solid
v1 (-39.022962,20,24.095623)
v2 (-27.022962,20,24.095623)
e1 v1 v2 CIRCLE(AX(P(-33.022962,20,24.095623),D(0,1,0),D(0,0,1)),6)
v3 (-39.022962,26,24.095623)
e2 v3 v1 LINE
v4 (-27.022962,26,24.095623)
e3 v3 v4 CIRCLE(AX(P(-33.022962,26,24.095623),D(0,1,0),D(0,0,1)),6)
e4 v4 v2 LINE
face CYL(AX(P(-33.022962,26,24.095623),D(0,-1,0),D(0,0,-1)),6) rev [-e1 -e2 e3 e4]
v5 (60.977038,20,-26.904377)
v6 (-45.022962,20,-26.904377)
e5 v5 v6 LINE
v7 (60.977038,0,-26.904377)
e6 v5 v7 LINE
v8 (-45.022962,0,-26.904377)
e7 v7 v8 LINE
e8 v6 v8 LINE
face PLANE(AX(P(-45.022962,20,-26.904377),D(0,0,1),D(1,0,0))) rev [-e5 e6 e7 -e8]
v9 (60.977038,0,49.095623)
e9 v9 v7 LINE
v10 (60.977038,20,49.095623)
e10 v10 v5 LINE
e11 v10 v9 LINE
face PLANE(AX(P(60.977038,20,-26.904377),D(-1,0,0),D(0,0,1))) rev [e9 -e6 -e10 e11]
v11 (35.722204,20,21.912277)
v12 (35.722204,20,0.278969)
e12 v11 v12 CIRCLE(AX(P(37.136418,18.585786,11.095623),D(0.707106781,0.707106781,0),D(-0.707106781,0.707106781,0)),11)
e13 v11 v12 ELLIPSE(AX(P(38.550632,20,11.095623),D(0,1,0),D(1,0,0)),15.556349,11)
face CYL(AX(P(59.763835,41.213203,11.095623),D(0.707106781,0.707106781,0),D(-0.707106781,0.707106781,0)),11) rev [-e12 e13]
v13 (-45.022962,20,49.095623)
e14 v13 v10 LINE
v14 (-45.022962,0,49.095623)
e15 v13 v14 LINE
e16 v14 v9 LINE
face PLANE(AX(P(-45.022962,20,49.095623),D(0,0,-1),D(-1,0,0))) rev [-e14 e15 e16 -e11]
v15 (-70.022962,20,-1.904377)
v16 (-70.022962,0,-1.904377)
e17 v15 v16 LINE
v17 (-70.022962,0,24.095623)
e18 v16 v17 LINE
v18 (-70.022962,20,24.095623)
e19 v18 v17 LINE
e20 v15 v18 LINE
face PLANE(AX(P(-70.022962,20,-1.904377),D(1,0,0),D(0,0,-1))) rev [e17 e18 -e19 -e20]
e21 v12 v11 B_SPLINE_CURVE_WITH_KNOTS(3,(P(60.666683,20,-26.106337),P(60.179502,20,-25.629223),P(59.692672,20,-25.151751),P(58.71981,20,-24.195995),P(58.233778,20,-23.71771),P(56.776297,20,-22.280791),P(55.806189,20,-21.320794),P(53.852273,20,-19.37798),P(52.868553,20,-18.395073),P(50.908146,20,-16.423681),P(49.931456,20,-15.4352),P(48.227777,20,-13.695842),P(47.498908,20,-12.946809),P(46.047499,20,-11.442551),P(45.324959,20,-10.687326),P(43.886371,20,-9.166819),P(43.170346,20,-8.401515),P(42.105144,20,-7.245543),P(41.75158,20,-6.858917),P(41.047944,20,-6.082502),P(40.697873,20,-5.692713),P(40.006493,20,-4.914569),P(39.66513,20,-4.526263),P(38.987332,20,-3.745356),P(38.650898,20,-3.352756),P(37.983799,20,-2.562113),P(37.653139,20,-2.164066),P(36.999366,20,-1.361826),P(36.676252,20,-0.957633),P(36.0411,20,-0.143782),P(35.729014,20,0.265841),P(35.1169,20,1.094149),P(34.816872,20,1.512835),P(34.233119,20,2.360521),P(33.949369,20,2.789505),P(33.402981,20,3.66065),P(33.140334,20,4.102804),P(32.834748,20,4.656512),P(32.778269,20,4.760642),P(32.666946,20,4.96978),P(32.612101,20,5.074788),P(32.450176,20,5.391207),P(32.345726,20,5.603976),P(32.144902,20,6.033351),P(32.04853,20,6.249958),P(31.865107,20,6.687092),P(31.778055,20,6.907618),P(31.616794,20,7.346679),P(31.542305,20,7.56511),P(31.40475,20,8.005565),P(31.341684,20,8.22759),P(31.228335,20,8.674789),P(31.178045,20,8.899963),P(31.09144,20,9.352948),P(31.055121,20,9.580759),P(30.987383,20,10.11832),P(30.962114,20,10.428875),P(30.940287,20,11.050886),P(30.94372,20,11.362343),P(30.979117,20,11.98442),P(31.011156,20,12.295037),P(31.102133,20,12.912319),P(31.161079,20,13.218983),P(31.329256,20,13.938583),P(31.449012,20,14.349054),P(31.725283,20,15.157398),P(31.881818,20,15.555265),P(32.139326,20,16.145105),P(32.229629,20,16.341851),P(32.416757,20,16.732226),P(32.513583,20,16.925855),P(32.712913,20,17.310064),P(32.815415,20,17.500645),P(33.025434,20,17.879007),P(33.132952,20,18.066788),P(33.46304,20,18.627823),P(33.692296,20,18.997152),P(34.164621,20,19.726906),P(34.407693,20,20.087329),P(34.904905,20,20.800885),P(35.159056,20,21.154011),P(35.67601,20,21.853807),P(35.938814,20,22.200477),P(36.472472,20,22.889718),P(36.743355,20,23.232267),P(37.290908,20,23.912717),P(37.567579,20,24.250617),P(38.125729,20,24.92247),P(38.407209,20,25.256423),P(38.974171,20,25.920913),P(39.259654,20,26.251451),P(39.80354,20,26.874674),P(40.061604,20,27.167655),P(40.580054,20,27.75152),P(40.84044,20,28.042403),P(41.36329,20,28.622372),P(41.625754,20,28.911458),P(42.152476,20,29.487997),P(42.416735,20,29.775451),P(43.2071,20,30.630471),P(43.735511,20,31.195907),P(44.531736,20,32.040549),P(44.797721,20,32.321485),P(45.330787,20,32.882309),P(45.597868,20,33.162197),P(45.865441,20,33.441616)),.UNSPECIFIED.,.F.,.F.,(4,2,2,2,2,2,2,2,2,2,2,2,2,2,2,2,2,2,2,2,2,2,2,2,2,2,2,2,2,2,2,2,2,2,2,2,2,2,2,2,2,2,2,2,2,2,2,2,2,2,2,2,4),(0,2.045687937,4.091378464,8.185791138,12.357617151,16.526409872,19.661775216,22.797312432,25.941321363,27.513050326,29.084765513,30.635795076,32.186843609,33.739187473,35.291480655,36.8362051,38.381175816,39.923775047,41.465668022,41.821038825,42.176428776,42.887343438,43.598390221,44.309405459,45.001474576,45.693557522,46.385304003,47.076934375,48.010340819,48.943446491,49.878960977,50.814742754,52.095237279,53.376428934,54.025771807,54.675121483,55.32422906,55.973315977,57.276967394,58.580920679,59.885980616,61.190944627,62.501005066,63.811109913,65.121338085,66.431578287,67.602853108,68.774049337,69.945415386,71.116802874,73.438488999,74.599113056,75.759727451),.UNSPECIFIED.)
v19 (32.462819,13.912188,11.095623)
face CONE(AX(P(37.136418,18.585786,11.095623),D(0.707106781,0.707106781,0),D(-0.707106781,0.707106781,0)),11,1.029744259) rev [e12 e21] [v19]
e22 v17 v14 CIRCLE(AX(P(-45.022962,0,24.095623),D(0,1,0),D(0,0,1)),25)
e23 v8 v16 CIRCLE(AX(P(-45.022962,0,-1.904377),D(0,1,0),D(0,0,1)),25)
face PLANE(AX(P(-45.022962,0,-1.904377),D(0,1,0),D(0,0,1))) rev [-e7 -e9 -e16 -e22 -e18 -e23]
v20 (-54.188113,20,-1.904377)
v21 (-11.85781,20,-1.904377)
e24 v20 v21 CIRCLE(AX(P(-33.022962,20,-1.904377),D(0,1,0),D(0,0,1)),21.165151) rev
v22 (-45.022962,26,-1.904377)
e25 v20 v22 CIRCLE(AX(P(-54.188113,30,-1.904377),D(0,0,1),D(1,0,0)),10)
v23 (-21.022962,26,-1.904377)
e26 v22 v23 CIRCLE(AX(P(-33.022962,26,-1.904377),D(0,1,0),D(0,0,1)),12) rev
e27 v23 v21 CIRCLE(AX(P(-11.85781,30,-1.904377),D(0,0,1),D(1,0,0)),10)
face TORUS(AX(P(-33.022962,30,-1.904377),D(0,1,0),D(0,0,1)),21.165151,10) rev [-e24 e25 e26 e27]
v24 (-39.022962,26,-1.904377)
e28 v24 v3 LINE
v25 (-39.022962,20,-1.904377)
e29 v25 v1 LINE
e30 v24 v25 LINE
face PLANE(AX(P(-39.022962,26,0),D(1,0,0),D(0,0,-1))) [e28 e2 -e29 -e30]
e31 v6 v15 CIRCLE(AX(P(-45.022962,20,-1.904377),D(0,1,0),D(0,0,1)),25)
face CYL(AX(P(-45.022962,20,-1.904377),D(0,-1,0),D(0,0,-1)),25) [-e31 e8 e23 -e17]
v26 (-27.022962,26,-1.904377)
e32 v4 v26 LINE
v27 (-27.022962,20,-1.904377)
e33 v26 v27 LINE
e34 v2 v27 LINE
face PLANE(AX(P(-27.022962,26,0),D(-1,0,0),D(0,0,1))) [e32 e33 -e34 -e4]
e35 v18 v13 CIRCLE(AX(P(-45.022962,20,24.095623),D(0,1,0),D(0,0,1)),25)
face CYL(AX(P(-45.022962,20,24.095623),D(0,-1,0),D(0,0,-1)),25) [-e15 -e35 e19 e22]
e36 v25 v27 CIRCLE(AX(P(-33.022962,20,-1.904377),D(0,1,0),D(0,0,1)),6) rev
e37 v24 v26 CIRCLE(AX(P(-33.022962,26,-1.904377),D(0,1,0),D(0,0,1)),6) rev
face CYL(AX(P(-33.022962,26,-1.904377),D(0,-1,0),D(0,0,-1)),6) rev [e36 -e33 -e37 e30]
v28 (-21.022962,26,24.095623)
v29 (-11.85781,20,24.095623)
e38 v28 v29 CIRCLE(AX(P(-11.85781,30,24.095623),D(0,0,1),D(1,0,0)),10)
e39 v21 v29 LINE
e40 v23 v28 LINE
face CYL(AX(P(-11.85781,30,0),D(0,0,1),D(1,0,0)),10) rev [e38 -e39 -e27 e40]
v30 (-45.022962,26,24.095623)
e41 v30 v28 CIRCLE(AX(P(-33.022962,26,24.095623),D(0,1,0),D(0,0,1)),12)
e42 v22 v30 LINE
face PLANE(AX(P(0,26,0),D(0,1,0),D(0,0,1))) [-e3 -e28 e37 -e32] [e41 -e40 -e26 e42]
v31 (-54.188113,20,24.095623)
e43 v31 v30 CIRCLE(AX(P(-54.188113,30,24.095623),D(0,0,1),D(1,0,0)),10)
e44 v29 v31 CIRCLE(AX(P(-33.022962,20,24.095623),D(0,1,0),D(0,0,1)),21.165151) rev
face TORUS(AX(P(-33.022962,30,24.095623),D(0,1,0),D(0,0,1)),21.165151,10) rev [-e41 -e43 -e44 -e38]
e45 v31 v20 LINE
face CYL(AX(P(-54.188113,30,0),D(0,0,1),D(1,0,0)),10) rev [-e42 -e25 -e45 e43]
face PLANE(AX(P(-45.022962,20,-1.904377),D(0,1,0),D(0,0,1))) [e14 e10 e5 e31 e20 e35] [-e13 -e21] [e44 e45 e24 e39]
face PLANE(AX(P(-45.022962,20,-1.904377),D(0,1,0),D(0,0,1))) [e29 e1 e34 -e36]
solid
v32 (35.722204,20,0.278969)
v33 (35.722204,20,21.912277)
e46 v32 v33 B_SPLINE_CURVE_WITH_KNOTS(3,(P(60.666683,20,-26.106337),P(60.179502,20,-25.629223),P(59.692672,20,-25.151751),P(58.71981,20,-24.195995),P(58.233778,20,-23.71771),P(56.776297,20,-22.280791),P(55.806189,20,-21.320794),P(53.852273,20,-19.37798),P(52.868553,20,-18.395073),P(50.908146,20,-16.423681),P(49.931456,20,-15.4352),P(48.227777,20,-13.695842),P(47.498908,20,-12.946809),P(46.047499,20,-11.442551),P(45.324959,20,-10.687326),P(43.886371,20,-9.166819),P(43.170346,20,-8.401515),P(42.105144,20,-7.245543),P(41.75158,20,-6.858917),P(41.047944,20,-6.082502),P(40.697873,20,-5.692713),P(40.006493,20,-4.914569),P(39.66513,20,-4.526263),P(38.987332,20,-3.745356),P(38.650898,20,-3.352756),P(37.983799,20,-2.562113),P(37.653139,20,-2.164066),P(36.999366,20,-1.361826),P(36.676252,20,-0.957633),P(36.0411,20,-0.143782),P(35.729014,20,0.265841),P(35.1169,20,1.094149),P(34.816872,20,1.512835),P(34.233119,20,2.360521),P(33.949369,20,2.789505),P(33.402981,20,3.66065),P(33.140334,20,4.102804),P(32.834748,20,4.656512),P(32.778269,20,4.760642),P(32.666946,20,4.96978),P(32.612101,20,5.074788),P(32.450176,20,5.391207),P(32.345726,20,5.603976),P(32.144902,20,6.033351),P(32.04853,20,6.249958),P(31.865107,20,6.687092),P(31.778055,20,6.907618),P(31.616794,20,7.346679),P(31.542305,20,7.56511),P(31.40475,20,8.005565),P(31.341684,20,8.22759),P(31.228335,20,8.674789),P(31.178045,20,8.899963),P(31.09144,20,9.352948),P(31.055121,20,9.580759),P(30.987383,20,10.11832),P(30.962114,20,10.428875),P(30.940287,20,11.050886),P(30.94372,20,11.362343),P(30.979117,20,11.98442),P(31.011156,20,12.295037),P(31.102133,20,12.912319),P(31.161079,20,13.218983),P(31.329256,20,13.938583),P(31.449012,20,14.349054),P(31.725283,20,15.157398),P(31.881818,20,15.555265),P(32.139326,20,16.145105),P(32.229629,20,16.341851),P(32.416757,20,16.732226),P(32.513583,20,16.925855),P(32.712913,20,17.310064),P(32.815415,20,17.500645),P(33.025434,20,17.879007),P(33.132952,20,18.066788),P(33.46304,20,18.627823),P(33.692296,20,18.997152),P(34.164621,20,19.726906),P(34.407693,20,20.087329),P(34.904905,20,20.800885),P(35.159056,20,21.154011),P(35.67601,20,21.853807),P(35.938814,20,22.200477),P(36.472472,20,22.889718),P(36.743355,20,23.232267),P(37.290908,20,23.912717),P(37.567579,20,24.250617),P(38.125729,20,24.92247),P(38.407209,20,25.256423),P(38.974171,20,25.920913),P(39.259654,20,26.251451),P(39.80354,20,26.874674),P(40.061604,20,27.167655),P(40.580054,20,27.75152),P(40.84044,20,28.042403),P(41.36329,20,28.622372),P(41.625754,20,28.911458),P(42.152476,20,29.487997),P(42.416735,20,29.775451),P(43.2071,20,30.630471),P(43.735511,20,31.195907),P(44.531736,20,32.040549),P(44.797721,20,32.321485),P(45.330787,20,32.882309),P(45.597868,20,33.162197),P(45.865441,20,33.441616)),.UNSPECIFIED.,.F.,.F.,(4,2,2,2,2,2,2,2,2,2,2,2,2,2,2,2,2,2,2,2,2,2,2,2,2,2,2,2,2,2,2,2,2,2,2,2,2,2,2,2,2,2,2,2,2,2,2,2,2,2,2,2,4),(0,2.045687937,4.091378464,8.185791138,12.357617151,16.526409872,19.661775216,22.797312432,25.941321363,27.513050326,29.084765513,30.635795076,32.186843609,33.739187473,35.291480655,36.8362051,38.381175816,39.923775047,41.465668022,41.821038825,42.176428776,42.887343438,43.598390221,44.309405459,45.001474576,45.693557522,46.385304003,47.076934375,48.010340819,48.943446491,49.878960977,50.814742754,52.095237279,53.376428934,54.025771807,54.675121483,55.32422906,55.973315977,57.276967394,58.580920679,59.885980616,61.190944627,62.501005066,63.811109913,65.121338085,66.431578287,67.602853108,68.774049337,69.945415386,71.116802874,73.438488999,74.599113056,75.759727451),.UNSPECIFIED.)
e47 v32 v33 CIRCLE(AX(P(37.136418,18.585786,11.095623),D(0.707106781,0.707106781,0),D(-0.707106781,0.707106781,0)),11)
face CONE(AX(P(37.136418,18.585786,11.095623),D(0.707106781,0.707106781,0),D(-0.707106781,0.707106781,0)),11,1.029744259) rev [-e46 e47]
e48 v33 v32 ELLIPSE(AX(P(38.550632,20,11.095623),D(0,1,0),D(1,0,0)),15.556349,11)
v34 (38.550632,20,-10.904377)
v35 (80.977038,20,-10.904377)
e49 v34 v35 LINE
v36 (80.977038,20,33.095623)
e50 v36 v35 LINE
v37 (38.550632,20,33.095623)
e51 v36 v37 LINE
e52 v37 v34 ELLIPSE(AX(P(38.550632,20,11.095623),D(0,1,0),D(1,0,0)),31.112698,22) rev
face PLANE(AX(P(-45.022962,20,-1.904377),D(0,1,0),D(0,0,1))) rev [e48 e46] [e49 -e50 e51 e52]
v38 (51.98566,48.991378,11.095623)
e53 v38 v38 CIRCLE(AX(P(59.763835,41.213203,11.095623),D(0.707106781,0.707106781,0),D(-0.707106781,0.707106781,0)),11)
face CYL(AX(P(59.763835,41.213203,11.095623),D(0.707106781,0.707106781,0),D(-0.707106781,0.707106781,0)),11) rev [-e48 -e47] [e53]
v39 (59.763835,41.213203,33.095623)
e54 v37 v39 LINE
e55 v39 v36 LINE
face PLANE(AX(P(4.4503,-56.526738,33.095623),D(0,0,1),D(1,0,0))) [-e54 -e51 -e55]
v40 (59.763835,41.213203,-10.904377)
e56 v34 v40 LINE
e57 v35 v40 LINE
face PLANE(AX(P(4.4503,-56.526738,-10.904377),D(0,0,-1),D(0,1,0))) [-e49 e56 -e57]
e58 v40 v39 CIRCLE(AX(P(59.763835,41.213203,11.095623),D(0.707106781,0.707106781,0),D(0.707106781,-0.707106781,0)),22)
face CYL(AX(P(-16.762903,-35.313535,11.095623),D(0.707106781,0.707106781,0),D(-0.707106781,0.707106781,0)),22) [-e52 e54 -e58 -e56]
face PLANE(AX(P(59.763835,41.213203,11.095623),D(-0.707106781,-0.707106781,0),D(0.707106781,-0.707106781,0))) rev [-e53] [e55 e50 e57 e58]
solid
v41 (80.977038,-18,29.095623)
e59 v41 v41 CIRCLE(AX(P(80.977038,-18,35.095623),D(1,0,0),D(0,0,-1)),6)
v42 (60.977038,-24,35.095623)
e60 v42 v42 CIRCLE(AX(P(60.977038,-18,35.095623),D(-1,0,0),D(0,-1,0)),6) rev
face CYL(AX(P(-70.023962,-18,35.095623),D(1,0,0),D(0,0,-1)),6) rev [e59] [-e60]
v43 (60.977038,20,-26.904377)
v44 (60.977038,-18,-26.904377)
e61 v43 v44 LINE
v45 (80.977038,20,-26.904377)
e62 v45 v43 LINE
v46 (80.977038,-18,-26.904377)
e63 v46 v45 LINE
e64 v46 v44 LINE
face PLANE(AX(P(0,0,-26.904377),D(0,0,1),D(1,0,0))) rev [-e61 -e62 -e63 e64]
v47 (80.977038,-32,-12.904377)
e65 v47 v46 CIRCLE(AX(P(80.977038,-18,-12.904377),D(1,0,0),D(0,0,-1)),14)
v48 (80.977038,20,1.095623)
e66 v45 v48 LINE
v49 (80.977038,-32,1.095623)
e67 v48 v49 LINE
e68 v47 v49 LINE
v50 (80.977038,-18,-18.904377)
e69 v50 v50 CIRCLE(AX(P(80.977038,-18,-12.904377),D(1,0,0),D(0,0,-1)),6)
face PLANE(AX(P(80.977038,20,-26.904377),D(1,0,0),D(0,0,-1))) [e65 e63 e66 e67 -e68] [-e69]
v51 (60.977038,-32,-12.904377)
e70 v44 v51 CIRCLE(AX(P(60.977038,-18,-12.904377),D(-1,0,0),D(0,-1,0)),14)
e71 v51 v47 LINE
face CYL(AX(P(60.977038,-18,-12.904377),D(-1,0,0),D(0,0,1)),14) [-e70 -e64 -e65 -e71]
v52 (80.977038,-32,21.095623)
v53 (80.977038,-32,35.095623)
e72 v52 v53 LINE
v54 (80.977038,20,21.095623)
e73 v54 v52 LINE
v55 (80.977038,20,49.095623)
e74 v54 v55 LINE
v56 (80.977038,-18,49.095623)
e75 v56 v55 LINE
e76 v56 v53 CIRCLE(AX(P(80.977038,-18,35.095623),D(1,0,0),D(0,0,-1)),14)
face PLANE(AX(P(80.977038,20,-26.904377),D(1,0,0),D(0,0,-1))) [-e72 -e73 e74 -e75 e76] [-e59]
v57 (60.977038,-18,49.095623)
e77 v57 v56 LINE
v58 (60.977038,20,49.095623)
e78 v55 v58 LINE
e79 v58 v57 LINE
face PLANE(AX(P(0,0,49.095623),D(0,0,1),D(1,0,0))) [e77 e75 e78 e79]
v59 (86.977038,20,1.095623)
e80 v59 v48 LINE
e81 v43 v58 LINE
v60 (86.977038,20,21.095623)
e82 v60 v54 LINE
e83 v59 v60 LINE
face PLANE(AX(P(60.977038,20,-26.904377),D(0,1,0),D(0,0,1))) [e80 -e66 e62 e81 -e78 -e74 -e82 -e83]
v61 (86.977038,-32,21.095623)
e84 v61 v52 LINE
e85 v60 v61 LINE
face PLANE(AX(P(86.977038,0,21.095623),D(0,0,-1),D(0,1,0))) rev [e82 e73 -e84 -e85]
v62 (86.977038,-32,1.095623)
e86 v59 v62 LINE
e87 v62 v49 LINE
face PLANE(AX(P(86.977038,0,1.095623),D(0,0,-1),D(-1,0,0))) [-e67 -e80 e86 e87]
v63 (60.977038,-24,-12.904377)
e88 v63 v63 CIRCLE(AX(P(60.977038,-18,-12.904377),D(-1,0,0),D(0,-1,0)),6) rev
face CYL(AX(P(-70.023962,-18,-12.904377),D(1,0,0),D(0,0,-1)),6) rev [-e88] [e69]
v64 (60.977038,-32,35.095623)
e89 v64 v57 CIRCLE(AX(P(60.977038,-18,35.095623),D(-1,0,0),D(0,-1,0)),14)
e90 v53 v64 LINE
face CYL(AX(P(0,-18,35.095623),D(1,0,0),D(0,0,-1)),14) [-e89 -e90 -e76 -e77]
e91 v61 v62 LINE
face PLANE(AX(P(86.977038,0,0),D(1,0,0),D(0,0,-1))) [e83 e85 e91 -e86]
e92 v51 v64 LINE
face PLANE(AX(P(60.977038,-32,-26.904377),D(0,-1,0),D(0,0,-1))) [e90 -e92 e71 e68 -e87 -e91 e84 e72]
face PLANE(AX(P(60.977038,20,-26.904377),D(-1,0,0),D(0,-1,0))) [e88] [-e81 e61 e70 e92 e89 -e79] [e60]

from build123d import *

# Parameters (mm, degrees)
BOSS_EXTRUDE1_DEPTH = 20
BOSS_EXTRUDE2_DEPTH = 6
FILLET1_R           = 10
SKETCH3_W           = 20
SKETCH3_H           = 52
BOSS_EXTRUDE3_DEPTH = 76
FILLET2_R           = 14
SKETCH4_W           = 20
SKETCH4_H           = 52
BOSS_EXTRUDE4_DEPTH = 6
BOSS_EXTRUDE5_REACH = 156.071
SKETCH4_3_R         = 6
CUT_EXTRUDE1_DEPTH  = 20
SKETCH4_4_R         = 6
CUT_EXTRUDE2_DEPTH  = 20


with BuildPart() as part:
    # Sketch1 → Boss-Extrude1 (new body)
    with BuildSketch(Plane(origin=(0, 0, 0), x_dir=(1, 0, 0), z_dir=(0, 1, 0))):
        with BuildLine():
            Line((-70.022961628, 1.904377184), (-70.022961628, -24.095622816))
            ThreePointArc((-70.022961628, -24.095622816), (-62.700631157, -41.773292346), (-45.022961628, -49.095622816))
            Line((-45.022961628, -49.095622816), (60.977038372, -49.095622816))
            Line((60.977038372, -49.095622816), (60.977038372, 26.904377184))
            Line((60.977038372, 26.904377184), (-45.022961628, 26.904377184))
            ThreePointArc((-45.022961628, 26.904377184), (-62.700631157, 19.582046714), (-70.022961628, 1.904377184))
        make_face()
    extrude(amount=BOSS_EXTRUDE1_DEPTH)

    # Sketch2 → Boss-Extrude2 (add)
    with BuildSketch(Plane(origin=(0, 20, 0), x_dir=(1, 0, 0), z_dir=(0, 1, 0))):
        with BuildLine():
            Line((-45.022961628, 1.904377184), (-45.022961628, -24.095622816))
            ThreePointArc((-45.022961628, -24.095622816), (-33.022961628, -36.095622816), (-21.022961628, -24.095622816))
            Line((-21.022961628, -24.095622816), (-21.022961628, 1.904377184))
            ThreePointArc((-21.022961628, 1.904377184), (-33.022961628, 13.904377184), (-45.022961628, 1.904377184))
        make_face()
        with BuildLine():
            ThreePointArc((-39.022961628, -24.095622816), (-33.022961628, -30.095622816), (-27.022961628, -24.095622816))
            Line((-27.022961628, -24.095622816), (-27.022961628, 1.904377184))
            ThreePointArc((-27.022961628, 1.904377184), (-33.022961628, 7.904377184), (-39.022961628, 1.904377184))
            Line((-39.022961628, 1.904377184), (-39.022961628, -24.095622816))
        make_face(mode=Mode.SUBTRACT)
    extrude(amount=BOSS_EXTRUDE2_DEPTH)

    # Fillet1
    # the kernel refuses this fillet: 10 mm, written as the material it adds along each edge
    with BuildSketch(Plane(origin=(-33.022961628, 20, -1.904377184), x_dir=(1, 0, 0), z_dir=(0, 0, 1))) as fillet1_piece_1:
        with BuildLine():
            CenterArc((21.16515139, 10), FILLET1_R, 203.578178478, 66.421821522)
            Line((12, 6), (11.816696972, 5.92))
            ThreePointArc((11.816696972, 5.92), (11.8, 3), (11.8, 0))
            Line((11.8, 0), (12, -0.2))
            Line((12, -0.2), (21.16515139, -0.2))
            Line((21.16515139, -0.2), (21.16515139, 0))
        make_face()
    revolve(axis=Axis((-33.022961628, 20, -1.904377184), (0, 1, 0)), revolution_arc=180)
    with BuildSketch(Plane(origin=(-45.022961628, 20, -1.904377184), x_dir=(-1, 0, 0), z_dir=(0, 0, 1)), Plane(origin=(-21.022961628, 20, 24.095622816), x_dir=(1, 0, 0), z_dir=(0, 0, -1))) as fillet1_piece_2:
        with BuildLine():
            CenterArc((9.16515139, -10), FILLET1_R, 90, 66.421821522)
            Line((0, -6), (-0.183303028, -5.92))
            ThreePointArc((-0.183303028, -5.92), (-0.2, -3), (-0.2, 0))
            Line((-0.2, 0), (0, 0.2))
            Line((0, 0.2), (9.16515139, 0.2))
            Line((9.16515139, 0.2), (9.16515139, 0))
        make_face()
    extrude(amount=26)
    with BuildSketch(Plane(origin=(-33.022961628, 20, 24.095622816), x_dir=(-1, 0, 0), z_dir=(0, 0, -1))) as fillet1_piece_3:
        with BuildLine():
            CenterArc((21.16515139, 10), FILLET1_R, 203.578178478, 66.421821522)
            Line((12, 6), (11.816696972, 5.92))
            ThreePointArc((11.816696972, 5.92), (11.8, 3), (11.8, 0))
            Line((11.8, 0), (12, -0.2))
            Line((12, -0.2), (21.16515139, -0.2))
            Line((21.16515139, -0.2), (21.16515139, 0))
        make_face()
    revolve(axis=Axis((-33.022961628, 20, 24.095622816), (0, 1, 0)), revolution_arc=180)


with BuildPart() as body_2:
    # Sketch3 → Boss-Extrude3 (new body)
    with BuildSketch(Plane.XY.offset(49.095622816)):
        with Locations((70.977038372, -6)):
            Rectangle(SKETCH3_W, SKETCH3_H)
    extrude(amount=-BOSS_EXTRUDE3_DEPTH)

    # Fillet2
    fillet2_edges = [body_2.edges().sort_by_distance(p)[0] for p in [
        (70.977038372, -32, 49.095622816),
        (70.977038372, -32, -26.904377184),
    ]]
    fillet(fillet2_edges, radius=FILLET2_R)

    # Sketch4 → Boss-Extrude4 (add)
    with BuildSketch(Plane(origin=(80.977038372, 0, 0), x_dir=(0, 0, -1), z_dir=(1, 0, 0))):
        with Locations((-11.095622816, -6)):
            Rectangle(SKETCH4_W, SKETCH4_H)
    extrude(amount=BOSS_EXTRUDE4_DEPTH)

    # Sketch4<3> → Cut-Extrude1 (cut)
    with BuildSketch(Plane(origin=(80.977038372, 0, 0), x_dir=(0, 0, -1), z_dir=(1, 0, 0))):
        with Locations((-35.095622816, -18)):
            Circle(SKETCH4_3_R)
    extrude(amount=-CUT_EXTRUDE1_DEPTH, mode=Mode.SUBTRACT)

    # Sketch4<4> → Cut-Extrude2 (cut)
    with BuildSketch(Plane(origin=(80.977038372, 0, 0), x_dir=(0, 0, -1), z_dir=(1, 0, 0))):
        with Locations((12.904377184, -18)):
            Circle(SKETCH4_4_R)
    extrude(amount=-CUT_EXTRUDE2_DEPTH, mode=Mode.SUBTRACT)


with BuildPart() as body_3:

    # Boss-Extrude5: up to this face of the body (flat: up to its plane)
    boss_extrude5_end = Plane(part.part.faces().sort_by_distance((-33.022961628, 20, 11.095622816))[0])
    # Sketch5 → Boss-Extrude5 (new, up to the picked face)
    with BuildSketch(Plane(origin=(50.488519186, 50.488519186, 0), x_dir=(0.7071067811865464, -0.7071067811865488, 0), z_dir=(0.7071067811865488, 0.7071067811865464, 0)), mode=Mode.PRIVATE) as boss_extrude5_sk1:
        with BuildLine():
            Line((43.11727733, -33.095622816), (13.11727733, -33.095622816))
            ThreePointArc((13.11727733, -33.095622816), (-8.88272267, -11.095622816), (13.11727733, 10.904377184))
            Line((13.11727733, 10.904377184), (43.11727733, 10.904377184))
            Line((43.11727733, 10.904377184), (43.11727733, -33.095622816))
        make_face()
    boss_extrude5_tool1 = split(extrude(boss_extrude5_sk1.sketch, amount=-BOSS_EXTRUDE5_REACH, mode=Mode.PRIVATE), bisect_by=boss_extrude5_end, keep=Keep.BOTH, mode=Mode.PRIVATE)
    add(boss_extrude5_tool1.solids().sort_by(Axis((64.081168, 36.89587, 11.095623), (-0.7071067811865488, -0.7071067811865464, 0)))[0])


with BuildPart() as f_20_0mm_dowel_hole1_tool:
    # Sketch8 → Ø20.0mm Dowel Hole1 (revolve)
    with BuildSketch(Plane(origin=(59.763834937, 41.213203436, 11.095622816), x_dir=(-0.7071067811865464, 0.7071067811865488, 0), z_dir=(0, 0, 1))):
        Polygon((0, 0), (0, 38.609466809), (11, 32), (11, 0), align=None)
    revolve(axis=Axis((64.253962997, 45.703331496, 11.095622816), (-0.7071067811865487, -0.7071067811865464, 0)))


with BuildPart() as part_1:
    add(part.part)

    # Ø20.0mm Dowel Hole1: cut by f_20_0mm_dowel_hole1_tool
    add(f_20_0mm_dowel_hole1_tool.part, mode=Mode.SUBTRACT)


with BuildPart() as body_3_1:
    add(body_3.part)

    # Ø20.0mm Dowel Hole1: cut by f_20_0mm_dowel_hole1_tool
    add(f_20_0mm_dowel_hole1_tool.part, mode=Mode.SUBTRACT)


solid = Compound([body_2.part, part_1.part, body_3_1.part])
